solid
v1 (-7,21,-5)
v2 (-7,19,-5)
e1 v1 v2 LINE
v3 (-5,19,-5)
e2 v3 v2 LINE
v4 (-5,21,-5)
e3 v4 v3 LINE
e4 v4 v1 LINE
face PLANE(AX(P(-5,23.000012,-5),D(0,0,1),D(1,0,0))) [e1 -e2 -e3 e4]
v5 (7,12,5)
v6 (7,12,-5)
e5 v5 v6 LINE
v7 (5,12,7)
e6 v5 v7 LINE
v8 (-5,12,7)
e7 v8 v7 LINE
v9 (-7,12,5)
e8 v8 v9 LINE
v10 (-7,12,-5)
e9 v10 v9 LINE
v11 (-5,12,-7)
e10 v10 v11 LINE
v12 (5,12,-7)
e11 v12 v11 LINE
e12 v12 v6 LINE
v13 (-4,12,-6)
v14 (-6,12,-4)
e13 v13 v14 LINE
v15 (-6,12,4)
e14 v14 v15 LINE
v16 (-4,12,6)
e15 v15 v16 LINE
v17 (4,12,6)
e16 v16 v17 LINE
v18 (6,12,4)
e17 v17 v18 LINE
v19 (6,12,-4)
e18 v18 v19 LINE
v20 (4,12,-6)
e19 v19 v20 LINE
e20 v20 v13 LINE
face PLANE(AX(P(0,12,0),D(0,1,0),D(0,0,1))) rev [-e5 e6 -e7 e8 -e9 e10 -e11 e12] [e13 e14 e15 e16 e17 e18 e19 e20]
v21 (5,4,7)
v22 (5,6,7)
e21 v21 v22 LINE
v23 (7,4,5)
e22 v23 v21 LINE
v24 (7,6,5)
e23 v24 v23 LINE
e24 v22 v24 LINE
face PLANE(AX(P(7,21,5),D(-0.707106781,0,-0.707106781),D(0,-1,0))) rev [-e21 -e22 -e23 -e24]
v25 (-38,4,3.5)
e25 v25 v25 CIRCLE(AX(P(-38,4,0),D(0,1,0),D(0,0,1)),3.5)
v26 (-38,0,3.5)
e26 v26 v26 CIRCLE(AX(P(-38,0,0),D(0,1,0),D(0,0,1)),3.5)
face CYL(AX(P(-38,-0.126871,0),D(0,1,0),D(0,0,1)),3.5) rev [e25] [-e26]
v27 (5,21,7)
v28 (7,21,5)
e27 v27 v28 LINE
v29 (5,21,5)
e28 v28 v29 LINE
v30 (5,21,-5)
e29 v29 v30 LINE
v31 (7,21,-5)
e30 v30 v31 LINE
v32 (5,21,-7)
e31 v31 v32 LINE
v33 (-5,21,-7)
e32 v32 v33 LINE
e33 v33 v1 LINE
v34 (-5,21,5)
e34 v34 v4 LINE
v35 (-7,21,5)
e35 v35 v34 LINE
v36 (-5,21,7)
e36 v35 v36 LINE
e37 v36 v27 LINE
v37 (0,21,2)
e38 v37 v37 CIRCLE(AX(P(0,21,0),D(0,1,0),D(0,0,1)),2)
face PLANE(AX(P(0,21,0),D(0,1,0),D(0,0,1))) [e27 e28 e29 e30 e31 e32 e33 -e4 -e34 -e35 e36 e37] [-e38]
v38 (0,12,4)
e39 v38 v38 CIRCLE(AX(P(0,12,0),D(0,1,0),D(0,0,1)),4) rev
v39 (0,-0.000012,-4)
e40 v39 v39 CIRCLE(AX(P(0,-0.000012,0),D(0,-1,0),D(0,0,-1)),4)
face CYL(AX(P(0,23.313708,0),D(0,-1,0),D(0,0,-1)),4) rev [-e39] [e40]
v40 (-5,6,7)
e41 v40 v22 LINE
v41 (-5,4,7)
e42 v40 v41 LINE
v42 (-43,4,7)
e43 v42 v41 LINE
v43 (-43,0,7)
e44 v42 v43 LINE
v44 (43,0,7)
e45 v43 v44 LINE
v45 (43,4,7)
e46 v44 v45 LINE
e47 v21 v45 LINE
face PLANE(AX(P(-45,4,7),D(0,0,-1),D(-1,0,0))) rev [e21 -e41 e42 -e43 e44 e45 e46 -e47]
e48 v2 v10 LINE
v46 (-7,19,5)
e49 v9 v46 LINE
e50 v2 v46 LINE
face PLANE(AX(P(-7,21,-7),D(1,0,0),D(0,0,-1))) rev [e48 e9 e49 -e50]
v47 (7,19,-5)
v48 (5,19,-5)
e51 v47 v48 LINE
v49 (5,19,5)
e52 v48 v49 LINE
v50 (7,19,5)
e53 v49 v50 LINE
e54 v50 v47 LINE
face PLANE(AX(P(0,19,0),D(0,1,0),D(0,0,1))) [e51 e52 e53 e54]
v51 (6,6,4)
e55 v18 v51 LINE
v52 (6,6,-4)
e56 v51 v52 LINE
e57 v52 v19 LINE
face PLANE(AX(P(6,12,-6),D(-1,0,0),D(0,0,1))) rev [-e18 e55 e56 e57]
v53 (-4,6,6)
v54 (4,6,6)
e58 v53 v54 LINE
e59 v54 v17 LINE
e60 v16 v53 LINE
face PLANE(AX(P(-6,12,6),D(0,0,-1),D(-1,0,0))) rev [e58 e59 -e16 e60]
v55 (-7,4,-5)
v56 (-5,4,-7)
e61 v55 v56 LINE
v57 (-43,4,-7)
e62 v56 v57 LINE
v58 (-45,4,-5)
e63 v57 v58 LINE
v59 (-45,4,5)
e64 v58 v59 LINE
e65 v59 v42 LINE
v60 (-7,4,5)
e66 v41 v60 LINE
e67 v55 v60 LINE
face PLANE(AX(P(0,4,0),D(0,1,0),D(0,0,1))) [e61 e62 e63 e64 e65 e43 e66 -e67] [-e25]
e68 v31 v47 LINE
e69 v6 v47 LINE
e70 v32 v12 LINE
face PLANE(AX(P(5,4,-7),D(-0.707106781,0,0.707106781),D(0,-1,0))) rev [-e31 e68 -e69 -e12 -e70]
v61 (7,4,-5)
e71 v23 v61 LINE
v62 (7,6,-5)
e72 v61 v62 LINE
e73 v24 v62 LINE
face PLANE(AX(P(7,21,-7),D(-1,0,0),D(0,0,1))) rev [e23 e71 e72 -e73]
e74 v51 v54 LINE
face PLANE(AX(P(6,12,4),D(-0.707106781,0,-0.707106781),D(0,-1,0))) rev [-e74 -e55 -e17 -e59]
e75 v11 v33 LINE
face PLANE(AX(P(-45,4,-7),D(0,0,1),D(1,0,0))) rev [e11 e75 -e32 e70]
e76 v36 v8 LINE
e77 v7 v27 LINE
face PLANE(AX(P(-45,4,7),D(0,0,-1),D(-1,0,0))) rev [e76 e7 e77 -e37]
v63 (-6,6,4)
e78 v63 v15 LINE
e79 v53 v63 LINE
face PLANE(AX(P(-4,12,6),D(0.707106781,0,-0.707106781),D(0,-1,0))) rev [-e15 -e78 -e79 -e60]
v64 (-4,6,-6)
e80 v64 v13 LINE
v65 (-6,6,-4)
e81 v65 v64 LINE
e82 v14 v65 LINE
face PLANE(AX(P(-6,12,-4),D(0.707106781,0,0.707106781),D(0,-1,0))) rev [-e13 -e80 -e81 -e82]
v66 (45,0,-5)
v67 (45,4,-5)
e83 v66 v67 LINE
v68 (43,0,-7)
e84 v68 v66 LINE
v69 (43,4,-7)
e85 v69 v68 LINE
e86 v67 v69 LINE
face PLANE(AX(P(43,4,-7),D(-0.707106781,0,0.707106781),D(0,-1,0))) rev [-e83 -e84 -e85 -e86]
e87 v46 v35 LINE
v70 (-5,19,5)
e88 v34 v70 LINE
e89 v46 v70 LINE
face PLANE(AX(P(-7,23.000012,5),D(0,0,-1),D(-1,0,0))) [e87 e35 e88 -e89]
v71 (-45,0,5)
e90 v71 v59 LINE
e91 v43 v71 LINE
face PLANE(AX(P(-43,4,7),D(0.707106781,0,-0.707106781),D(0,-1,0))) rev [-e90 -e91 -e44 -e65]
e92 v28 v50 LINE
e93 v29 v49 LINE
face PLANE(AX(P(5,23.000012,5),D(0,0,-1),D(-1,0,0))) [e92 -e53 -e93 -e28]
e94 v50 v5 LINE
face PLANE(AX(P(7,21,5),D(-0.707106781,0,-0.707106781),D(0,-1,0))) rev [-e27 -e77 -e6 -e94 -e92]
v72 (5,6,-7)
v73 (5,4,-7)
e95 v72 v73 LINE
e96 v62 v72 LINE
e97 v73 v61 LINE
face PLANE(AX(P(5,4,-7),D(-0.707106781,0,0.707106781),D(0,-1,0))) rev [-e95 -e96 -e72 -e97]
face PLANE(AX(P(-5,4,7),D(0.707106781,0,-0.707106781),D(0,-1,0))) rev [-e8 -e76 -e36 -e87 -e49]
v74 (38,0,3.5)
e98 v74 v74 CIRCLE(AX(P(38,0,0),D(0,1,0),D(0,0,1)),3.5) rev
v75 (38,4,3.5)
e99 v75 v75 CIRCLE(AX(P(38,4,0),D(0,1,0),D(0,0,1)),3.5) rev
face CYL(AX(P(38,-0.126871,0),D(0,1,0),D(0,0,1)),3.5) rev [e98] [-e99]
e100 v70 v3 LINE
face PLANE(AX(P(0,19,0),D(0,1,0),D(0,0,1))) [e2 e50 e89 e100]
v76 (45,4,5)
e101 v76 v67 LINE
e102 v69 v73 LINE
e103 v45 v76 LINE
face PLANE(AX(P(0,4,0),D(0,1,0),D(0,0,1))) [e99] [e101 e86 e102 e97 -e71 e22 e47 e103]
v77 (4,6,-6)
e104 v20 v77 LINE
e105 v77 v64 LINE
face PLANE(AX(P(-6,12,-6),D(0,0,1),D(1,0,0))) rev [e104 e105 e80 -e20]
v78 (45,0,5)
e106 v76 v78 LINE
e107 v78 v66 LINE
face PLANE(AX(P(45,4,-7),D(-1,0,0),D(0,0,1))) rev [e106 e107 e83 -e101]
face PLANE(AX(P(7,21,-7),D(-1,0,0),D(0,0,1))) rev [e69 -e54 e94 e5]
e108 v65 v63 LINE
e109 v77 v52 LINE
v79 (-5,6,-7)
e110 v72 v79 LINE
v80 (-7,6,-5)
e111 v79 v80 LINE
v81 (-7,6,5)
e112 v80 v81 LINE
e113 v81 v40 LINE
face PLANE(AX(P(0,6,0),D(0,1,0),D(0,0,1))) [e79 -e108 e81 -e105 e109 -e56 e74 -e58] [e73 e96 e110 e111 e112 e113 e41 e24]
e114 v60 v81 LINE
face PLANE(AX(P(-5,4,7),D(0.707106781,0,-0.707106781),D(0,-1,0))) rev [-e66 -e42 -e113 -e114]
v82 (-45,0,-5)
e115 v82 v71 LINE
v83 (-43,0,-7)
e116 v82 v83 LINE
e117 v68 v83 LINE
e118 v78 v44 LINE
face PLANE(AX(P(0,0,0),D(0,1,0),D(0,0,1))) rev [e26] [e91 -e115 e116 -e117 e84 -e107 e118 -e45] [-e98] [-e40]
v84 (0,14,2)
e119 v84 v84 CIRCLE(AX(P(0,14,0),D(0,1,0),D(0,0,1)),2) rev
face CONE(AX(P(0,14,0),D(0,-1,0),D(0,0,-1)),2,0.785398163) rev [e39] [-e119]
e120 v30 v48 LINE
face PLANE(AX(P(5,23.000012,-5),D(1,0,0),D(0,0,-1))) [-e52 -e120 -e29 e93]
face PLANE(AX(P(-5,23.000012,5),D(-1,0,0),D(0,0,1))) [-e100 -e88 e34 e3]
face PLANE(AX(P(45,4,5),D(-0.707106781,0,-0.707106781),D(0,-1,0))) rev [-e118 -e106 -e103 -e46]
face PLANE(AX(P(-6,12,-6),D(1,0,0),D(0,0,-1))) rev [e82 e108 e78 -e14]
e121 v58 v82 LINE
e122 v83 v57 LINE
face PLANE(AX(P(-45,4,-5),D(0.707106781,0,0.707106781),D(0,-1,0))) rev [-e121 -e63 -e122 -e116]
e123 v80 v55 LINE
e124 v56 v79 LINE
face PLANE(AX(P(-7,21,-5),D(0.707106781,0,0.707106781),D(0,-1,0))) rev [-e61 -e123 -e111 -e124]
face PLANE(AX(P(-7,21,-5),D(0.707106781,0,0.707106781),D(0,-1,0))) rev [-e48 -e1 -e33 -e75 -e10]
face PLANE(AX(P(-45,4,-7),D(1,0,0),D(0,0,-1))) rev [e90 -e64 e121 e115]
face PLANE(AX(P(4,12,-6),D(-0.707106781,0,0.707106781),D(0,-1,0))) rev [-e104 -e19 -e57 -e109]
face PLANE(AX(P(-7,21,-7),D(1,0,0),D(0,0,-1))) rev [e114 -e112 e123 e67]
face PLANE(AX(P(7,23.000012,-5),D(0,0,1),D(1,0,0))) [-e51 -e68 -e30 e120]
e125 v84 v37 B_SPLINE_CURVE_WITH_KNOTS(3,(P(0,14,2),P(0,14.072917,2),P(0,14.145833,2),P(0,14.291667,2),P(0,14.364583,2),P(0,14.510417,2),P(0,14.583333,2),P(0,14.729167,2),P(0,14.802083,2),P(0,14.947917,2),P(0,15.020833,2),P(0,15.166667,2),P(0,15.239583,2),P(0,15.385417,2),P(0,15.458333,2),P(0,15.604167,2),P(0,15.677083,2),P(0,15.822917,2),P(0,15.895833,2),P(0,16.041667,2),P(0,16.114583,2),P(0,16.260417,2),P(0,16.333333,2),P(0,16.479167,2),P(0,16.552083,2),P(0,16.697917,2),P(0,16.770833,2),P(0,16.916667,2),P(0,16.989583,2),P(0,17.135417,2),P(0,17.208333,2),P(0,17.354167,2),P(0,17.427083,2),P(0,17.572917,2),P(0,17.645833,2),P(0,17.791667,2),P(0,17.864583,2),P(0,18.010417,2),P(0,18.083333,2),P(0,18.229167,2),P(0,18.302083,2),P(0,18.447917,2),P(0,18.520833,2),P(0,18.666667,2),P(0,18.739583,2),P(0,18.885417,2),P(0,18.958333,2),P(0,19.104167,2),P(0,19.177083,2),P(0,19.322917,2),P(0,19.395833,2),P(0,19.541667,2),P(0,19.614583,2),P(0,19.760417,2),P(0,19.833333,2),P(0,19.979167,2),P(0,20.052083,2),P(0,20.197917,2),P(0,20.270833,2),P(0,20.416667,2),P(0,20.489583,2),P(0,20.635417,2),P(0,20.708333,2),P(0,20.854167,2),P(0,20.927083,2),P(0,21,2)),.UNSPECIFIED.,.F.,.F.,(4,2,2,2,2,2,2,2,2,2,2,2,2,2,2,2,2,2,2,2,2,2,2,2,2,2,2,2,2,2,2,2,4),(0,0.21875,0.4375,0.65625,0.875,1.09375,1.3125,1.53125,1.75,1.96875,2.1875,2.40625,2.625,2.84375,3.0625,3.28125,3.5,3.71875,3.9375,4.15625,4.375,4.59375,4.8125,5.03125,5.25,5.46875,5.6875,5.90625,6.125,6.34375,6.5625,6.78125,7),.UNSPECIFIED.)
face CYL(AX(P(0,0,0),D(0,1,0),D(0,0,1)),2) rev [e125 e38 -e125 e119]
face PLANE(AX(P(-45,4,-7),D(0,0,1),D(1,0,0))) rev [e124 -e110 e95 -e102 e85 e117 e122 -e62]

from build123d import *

# Parameters (mm, degrees)
SKETCH_1_W               = 90
SKETCH_1_H               = 14
EXTRUDE_1_DEPTH          = 4
CHAMFER_1_SIZE           = 2
SKETCH_2_W               = 14
SKETCH_2_H               = 14
EXTRUDE_2_DEPTH          = 17
CUT_EXTRUDE_START        = 2
SKETCH_3_OUTSIDE_W       = 110.694
SKETCH_3_OUTSIDE_H       = 34.694
SKETCH_3_OUTSIDE_W_2     = 12
SKETCH_3_OUTSIDE_H_2     = 12
CUT_EXTRUDE_1_DEPTH      = 6
CHAMFER_2_SIZE           = 2
SKETCH_4_W               = 2
SKETCH_4_H               = 10
EXTRUDE_3_DEPTH          = 2
CUT_EXTRUDE_2_DEPTH      = 51.149775672
CUT_EXTRUDE_2_DEPTH_BACK = 51.149775672
SKETCH_5_R               = 2
CUT_EXTRUDE_3_DEPTH      = 52.019604075
CUT_EXTRUDE_3_DEPTH_BACK = 12
SKETCH_6_R               = 4
CHAMFER_3_SIZE           = 2
SKETCH_7_R               = 3.5
CUT_EXTRUDE_4_DEPTH      = 50.345719166
CUT_EXTRUDE_5_DEPTH      = 52.019604075
CUT_EXTRUDE_5_DEPTH_BACK = 4
SKETCH_8_W               = 2
SKETCH_8_H               = 10


with BuildPart() as part:
    # 草图1 → 凸台-拉伸1 (new body)
    with BuildSketch(Plane(origin=(0, 0, 0), x_dir=(1, 0, 0), z_dir=(0, 1, 0))):
        Rectangle(SKETCH_1_W, SKETCH_1_H)
    extrude(amount=EXTRUDE_1_DEPTH)

    # 倒角1
    chamfer_1_edges = [part.edges().sort_by_distance(p)[0] for p in [
        (45, 2, 7),
        (-45, 2, 7),
        (-45, 2, -7),
        (45, 2, -7),
    ]]
    chamfer(chamfer_1_edges, length=CHAMFER_1_SIZE)

    # 草图2 → 凸台-拉伸2 (add)
    with BuildSketch(Plane(origin=(0, 4, 0), x_dir=(1, 0, 0), z_dir=(0, 1, 0))):
        Rectangle(SKETCH_2_W, SKETCH_2_H)
    extrude(amount=EXTRUDE_2_DEPTH)

    # 草图3 outside → 切除-拉伸1 (cut)
    with BuildSketch(Plane(origin=(0, 4, 0), x_dir=(1, 0, 0), z_dir=(0, 1, 0)).offset(CUT_EXTRUDE_START)):
        Rectangle(SKETCH_3_OUTSIDE_W, SKETCH_3_OUTSIDE_H)
        Rectangle(SKETCH_3_OUTSIDE_W_2, SKETCH_3_OUTSIDE_H_2, mode=Mode.SUBTRACT)
    extrude(amount=CUT_EXTRUDE_1_DEPTH, mode=Mode.SUBTRACT)

    # 倒角2
    chamfer_2_edges = [part.edges().sort_by_distance(p)[0] for p in [
        (7, 16.5, 7),
        (7, 16.5, -7),
        (-7, 16.5, -7),
        (-7, 16.5, 7),
        (-7, 5, 7),
        (-7, 5, -7),
        (7, 5, -7),
        (7, 5, 7),
        (6, 9, -6),
        (-6, 9, -6),
        (-6, 9, 6),
        (6, 9, 6),
    ]]
    chamfer(chamfer_2_edges, length=CHAMFER_2_SIZE)

    # 草图4 → 凸台-拉伸3 (add)
    with BuildSketch(Plane(origin=(0, 21, 0), x_dir=(1, 0, 0), z_dir=(0, 1, 0))):
        with Locations((-6, 0)):
            Rectangle(SKETCH_4_W, SKETCH_4_H)
    extrude_3 = extrude(amount=EXTRUDE_3_DEPTH)

    # 镜向1: 凸台-拉伸3 across plane
    add(extrude_3.mirror(Plane(origin=(0, 0, 0), x_dir=(0, 0, 1), z_dir=(1, 0, 0))))

    # 草图5 → 切除-拉伸2 (cut, two sides: drawn at the far end of the back side and taken through both)
    with BuildSketch(Plane(origin=(0, 21, 0), x_dir=(1, 0, 0), z_dir=(0, 1, 0)).offset(-CUT_EXTRUDE_2_DEPTH_BACK)):
        with Locations(Location((0, 0, 0), (0, 0, 270))):
            Circle(SKETCH_5_R)
    extrude(amount=CUT_EXTRUDE_2_DEPTH + CUT_EXTRUDE_2_DEPTH_BACK, mode=Mode.SUBTRACT)

    # 草图6 → 切除-拉伸3 (cut, two sides: drawn at the far end of the back side and taken through both)
    with BuildSketch(Plane.XZ.offset(-CUT_EXTRUDE_3_DEPTH_BACK)):
        with Locations(Location((0, 0, 0), (0, 0, 270))):
            Circle(SKETCH_6_R)
    extrude(amount=CUT_EXTRUDE_3_DEPTH + CUT_EXTRUDE_3_DEPTH_BACK, mode=Mode.SUBTRACT)

    # 倒角3
    chamfer_3_edges = [part.edges().sort_by_distance(p)[0] for p in [
        (0, 12, -2),
    ]]
    chamfer(chamfer_3_edges, length=CHAMFER_3_SIZE - 0.0001)  # a hair under: the kernel refuses the full size

    # 草图7 → 切除-拉伸4 (cut, symmetric)
    with BuildSketch(Plane(origin=(0, 4, 0), x_dir=(1, 0, 0), z_dir=(0, 1, 0))):
        with Locations(Location((-38, 0, 0), (0, 0, 270))):
            Circle(SKETCH_7_R)
    cut_extrude_4 = extrude(amount=CUT_EXTRUDE_4_DEPTH, both=True, mode=Mode.SUBTRACT)

    # 镜向2: 切除-拉伸4 across plane
    add(cut_extrude_4.mirror(Plane(origin=(0, 0, 0), x_dir=(0, 0, 1), z_dir=(1, 0, 0))), mode=Mode.SUBTRACT)

    # 草图8 → 切除-拉伸5 (cut, two sides: drawn at the far end of the back side and taken through both)
    with BuildSketch(Plane(origin=(0, 23, 0), x_dir=(1, 0, 0), z_dir=(0, 1, 0)).offset(-CUT_EXTRUDE_5_DEPTH_BACK)):
        with Locations((6, 0)):
            Rectangle(SKETCH_8_W, SKETCH_8_H)
        with Locations((-6, 0)):
            Rectangle(SKETCH_8_W, SKETCH_8_H)
    extrude(amount=CUT_EXTRUDE_5_DEPTH + CUT_EXTRUDE_5_DEPTH_BACK, mode=Mode.SUBTRACT)


solid = part.part
